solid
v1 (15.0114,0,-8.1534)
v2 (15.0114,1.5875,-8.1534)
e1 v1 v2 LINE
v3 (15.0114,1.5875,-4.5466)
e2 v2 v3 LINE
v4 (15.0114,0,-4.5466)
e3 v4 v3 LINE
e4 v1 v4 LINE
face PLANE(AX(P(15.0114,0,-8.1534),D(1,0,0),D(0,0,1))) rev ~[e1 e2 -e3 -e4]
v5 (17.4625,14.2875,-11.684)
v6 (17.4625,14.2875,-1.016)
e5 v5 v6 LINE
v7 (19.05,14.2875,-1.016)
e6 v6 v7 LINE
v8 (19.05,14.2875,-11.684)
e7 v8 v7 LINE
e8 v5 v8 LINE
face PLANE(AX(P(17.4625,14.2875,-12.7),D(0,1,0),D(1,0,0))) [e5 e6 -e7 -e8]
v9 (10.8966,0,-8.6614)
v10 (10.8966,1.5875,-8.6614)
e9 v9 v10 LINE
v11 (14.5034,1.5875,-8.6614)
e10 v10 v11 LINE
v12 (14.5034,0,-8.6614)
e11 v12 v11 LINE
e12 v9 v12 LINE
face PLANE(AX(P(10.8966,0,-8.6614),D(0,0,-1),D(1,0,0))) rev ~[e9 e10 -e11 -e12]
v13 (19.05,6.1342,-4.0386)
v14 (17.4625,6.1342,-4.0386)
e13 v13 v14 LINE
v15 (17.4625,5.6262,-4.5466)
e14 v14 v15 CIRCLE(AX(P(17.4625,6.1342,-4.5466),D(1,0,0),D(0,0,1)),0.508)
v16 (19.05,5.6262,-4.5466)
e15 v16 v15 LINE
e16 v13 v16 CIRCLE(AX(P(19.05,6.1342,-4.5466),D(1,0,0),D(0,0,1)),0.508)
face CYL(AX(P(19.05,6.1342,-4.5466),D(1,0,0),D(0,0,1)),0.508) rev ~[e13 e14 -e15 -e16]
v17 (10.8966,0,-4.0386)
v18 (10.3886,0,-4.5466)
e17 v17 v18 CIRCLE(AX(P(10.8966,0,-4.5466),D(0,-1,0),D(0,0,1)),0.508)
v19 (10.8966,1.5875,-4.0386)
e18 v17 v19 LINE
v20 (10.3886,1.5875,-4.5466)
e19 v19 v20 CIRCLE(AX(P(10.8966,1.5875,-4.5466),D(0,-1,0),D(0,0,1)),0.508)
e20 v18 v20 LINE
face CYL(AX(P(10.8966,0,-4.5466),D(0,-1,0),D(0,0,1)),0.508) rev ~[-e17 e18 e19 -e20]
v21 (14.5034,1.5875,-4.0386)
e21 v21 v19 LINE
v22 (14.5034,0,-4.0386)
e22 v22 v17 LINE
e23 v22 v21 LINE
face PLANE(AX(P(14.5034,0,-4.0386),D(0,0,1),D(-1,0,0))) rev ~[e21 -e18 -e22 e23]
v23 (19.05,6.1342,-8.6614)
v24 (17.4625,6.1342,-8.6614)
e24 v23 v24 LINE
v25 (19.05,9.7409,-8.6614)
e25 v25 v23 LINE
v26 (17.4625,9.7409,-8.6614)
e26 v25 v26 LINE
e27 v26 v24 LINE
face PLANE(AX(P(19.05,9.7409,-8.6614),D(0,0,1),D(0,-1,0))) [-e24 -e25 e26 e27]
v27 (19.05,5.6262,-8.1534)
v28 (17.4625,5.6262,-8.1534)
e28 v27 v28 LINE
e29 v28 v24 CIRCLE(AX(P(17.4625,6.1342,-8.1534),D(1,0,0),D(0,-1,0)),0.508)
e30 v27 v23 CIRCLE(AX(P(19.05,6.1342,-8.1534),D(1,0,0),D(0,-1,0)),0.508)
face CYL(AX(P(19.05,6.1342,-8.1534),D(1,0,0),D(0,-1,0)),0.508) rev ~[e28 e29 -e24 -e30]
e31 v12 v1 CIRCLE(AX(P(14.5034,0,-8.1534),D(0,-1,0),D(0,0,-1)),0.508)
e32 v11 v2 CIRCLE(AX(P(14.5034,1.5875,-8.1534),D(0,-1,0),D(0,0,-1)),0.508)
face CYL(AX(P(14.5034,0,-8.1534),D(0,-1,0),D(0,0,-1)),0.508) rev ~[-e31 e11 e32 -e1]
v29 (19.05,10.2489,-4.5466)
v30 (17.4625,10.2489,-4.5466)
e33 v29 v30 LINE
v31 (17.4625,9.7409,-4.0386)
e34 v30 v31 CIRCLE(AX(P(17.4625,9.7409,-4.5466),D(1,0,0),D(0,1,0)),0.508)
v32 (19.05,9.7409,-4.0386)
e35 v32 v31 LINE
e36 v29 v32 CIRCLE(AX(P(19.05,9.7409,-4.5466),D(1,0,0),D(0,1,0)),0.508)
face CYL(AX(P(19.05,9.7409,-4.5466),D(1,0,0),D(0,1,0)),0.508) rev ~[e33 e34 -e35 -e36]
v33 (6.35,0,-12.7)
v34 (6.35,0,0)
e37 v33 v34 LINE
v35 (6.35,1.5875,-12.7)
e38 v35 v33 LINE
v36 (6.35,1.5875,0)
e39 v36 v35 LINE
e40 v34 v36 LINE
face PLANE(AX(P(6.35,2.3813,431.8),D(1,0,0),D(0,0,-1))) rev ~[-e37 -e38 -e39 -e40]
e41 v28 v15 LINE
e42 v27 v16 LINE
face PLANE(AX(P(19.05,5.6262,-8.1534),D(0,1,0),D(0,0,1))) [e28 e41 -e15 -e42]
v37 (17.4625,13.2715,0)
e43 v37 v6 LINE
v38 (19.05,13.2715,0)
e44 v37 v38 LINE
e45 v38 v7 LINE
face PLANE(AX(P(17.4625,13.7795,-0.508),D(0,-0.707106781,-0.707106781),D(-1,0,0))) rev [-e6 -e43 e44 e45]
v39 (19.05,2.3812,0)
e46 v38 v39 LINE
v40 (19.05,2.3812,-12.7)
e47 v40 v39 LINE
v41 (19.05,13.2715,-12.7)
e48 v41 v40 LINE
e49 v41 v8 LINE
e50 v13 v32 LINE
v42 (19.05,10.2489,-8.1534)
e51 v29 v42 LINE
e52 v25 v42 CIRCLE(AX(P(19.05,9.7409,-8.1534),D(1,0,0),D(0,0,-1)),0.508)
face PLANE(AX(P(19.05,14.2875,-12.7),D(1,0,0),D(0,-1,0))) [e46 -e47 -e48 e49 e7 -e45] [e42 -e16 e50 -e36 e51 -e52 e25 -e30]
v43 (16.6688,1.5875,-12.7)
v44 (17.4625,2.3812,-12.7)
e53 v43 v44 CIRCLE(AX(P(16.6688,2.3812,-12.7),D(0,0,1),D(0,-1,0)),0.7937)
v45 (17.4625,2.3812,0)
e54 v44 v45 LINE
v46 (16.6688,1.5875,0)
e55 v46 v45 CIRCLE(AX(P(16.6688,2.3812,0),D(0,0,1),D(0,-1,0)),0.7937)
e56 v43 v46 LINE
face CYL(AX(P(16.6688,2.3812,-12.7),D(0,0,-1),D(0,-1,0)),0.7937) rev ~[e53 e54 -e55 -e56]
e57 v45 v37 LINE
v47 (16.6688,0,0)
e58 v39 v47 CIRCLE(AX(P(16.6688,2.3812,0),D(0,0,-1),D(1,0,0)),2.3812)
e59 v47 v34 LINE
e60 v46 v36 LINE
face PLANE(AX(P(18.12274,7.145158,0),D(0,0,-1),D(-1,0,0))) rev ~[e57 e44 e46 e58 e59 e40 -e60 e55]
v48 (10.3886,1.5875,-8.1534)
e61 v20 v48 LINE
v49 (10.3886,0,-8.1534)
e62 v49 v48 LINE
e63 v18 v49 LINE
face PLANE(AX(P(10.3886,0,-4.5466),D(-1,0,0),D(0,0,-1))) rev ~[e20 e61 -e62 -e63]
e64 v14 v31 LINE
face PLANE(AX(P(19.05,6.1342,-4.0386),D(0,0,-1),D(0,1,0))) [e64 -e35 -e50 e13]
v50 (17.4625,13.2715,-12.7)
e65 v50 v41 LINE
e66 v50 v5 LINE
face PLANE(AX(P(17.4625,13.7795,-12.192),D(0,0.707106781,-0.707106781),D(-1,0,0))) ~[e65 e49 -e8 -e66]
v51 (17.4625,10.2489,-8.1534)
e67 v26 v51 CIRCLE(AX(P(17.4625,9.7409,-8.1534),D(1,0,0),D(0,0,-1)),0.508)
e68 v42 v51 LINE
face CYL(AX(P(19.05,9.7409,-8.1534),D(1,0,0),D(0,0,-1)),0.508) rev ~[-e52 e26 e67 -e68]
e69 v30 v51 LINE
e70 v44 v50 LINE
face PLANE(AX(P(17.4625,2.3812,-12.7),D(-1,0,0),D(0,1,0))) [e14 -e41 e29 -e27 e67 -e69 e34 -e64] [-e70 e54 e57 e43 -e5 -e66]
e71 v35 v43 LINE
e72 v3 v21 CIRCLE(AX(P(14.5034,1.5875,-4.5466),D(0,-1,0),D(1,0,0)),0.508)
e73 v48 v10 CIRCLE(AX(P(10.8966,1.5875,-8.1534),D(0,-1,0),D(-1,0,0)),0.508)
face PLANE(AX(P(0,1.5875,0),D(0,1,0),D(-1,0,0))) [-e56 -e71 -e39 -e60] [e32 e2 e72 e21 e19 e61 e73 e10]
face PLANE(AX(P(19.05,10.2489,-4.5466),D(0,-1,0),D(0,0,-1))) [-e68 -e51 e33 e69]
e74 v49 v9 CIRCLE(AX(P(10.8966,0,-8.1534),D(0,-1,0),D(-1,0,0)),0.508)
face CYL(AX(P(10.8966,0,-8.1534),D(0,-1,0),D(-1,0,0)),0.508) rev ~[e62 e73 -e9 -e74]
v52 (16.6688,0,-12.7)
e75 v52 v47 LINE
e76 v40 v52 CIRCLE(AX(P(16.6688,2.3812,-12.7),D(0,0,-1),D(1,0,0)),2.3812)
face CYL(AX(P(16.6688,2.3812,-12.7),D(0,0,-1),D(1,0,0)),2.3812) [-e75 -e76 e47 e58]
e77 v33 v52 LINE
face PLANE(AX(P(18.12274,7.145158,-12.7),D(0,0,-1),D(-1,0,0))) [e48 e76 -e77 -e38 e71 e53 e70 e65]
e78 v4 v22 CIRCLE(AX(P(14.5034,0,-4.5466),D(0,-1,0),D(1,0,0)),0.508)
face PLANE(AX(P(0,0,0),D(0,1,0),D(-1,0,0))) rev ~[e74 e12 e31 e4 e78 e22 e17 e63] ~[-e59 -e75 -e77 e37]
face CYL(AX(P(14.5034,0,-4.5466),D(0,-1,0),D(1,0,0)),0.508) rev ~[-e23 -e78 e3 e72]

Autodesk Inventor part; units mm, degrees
ref_plane "YZ Plane" through (0, 0, 0) normal (1, 0, 0) x (0, 1, 0)
ref_plane "XZ Plane" through (0, 0, 0) normal (0, 1, 0) x (-1, 0, 0)
sketch "Sketch1" plane through (0, 0, 0) normal (0, 1, 0) x (-1, 0, 0)
  line L0 (-19.05, 0) -> (19.05, 0)
  line L1 (19.05, 0) -> (19.05, -12.7)
  line L2 (19.05, -12.7) -> (-19.05, -12.7)
  line L3 (-19.05, -12.7) -> (-19.05, 0)
  line L4 (19.05, 0) -> (-19.05, -12.7) construction
  point P0 (0, 0)
  point P1 (0, 0)
  dimension "d0" = 38.1
  dimension "d1" = 12.7
extrude "Plate1" add sketch "Sketch1" along normal blind 1.5875
sketch "Sketch2" plane through (17.4625, 0, -12.7) normal (1, 0, 0) x (0, 1, 0)
  line L0 (0, 12.7) -> (0, 0)
  line L1 (0, 0) -> (14.2875, 0)
  line L2 (14.2875, 0) -> (14.2875, 12.7)
  line L3 (14.2875, 12.7) -> (0, 12.7)
edge flange "Flanges" height 12.7 angle 90 thickness 1.5875 bend radius 0.7937 thickness toward (1, 0, 0) relief tear relief width 1.5875 relief depth 0.7937 corner gap 1.5875 corner form 0 edges at (19.05, 1.5875, -6.35) (-19.05, 1.5875, -6.35) wall of the first edge with corners at (17.4625, 0, 0) (17.4625, 0, -12.7) (17.4625, 14.2875, -12.7) (17.4625, 14.2875, 0)
bend "Bend1"
corner "Corner1"
sketch "Sketch3" plane through (19.05, 2.3813, -12.7) normal (1, 0, 0) x (0, 0, -1)
  line L0 (-8.1534, 7.8676) -> (-4.5466, 7.8676)
  line L1 (-4.0386, 7.3596) -> (-4.0386, 3.7529)
  line L2 (-4.5466, 3.2449) -> (-8.1534, 3.2449)
  line L3 (-8.6614, 3.7529) -> (-8.6614, 7.3596)
  arc A0 (-8.1534, 7.8676) -> (-8.6614, 7.3596) centre (-8.1534, 7.3596) ccw
  arc A1 (-4.0386, 7.3596) -> (-4.5466, 7.8676) centre (-4.5466, 7.3596) ccw
  arc A2 (-4.5466, 3.2449) -> (-4.0386, 3.7529) centre (-4.5466, 3.7529) ccw
  arc A3 (-8.6614, 3.7529) -> (-8.1534, 3.2449) centre (-8.1534, 3.7529) ccw
  line L4 (-12.7, 0) -> (-12.7, 11.9063) construction
  line L5 (-12.7, 11.9063) -> (0, 11.9063) construction
  line L6 (-8.1534, 7.3596) -> (-4.5466, 3.7529) construction
  point P0 (-12.7, -2.3812)
  point P1 (-4.0386, 3.2449)
  point P2 (-8.6614, 3.2449)
  point P3 (-6.35, 5.5563)
  dimension "d16" = 4.6228
  dimension "d17" = 0.508
  dimension "d20" = 6.35
  dimension "d21" = 6.35
extrude "Flange Stamp" cut sketch "Sketch3" against normal blind 1.5875
sketch "Sketch7" plane through (19.05, 2.3813, 0) normal (1, 0, 0) x (0, 0, -1)
  arc A0 (4.5466, 7.8676) -> (4.0386, 7.3596) centre (4.5466, 7.3596) ccw construction
  arc A1 (8.1534, 3.2449) -> (8.6614, 3.7529) centre (8.1534, 3.7529) ccw construction
  circle A2 centre (6.35, 5.5563) radius 2.1844
  line L0 (4.5466, 7.3596) -> (8.1534, 3.7529) construction
  point P0 (0, -2.3812)
  dimension "d46" = 4.3688
surface extrude "Flange Circle" sketch "Sketch7" against normal up to surface (1.5875 mm away) shown yes curves A2
ref_plane "Flange Pattern Plane" through (19.05, 7.9375, -4.5466) normal (0, 1, 0) x (1, 0, 0)
feature "Flange Pattern" [suppressed]
sketch "Sketch8" plane through (0, 0, 0) normal (0, -1, 0) x (1, 0, 0)
  line L0 (16.6687, 0) -> (-16.6687, 0) construction
  line L1 (14.5034, -4.0386) -> (10.8966, -4.0386)
  line L2 (10.3886, -4.5466) -> (10.3886, -8.1534)
  line L3 (10.8966, -8.6614) -> (14.5034, -8.6614)
  line L4 (15.0114, -8.1534) -> (15.0114, -4.5466)
  arc A0 (15.0114, -4.5466) -> (14.5034, -4.0386) centre (14.5034, -4.5466) ccw
  arc A1 (14.5034, -8.6614) -> (15.0114, -8.1534) centre (14.5034, -8.1534) ccw
  arc A2 (10.3886, -8.1534) -> (10.8966, -8.6614) centre (10.8966, -8.1534) ccw
  arc A3 (10.8966, -4.0386) -> (10.3886, -4.5466) centre (10.8966, -4.5466) ccw
  line L5 (14.5034, -4.5466) -> (10.8966, -8.1534) construction
  line L6 (19.05, 0) -> (19.05, -12.7) construction
  point P0 (0, 0)
  point P1 (10.3886, -8.6614)
  point P2 (15.0114, -8.6614)
  point P3 (12.7, -6.35)
  dimension "d49" = 4.6228
  dimension "d50" = 0.508
  dimension "d51" = 6.35
  dimension "d52" = 6.35
extrude "Body Stamp" cut sketch "Sketch8" against normal blind 1.5875
sketch "Sketch9" plane through (0, 0, 0) normal (0, -1, 0) x (1, 0, 0)
  arc A0 (15.0114, -4.5466) -> (14.5034, -4.0386) centre (14.5034, -4.5466) ccw construction
  arc A1 (10.3886, -8.1534) -> (10.8966, -8.6614) centre (10.8966, -8.1534) ccw construction
  line L0 (14.5034, -4.5466) -> (10.8966, -8.1534) construction
  circle A2 centre (12.7, -6.35) radius 2.1844
  point P0 (0, 0)
  dimension "d55" = 4.3688
surface extrude "Body Circle" sketch "Sketch9" against normal up to surface (1.5875 mm away) shown yes curves A2
feature "Body Pattern" [suppressed]
sketch "Arc Length" plane through (17.4625, 2.3813, 0) normal (0, 0, 1) x (1, 0, 0)
  line L0 (0, 0) -> (1.5875, 0) construction
  arc A0 (-0.7938, -0.7938) -> (0, 0) centre (-0.7937, 0) ccw construction
  line L1 (-0.7938, -2.3813) -> (-0.7938, -0.7938) construction
  arc A1 (-0.7938, -2.3813) -> (1.5875, 0) centre (-0.7937, 0) ccw construction
  point P0 (-17.4625, -2.3812)
  dimension "d85" = 3.7405
  dimension "d92" = 1.2468
feature "Notch" [suppressed]
mirror "Notch Mirror" [suppressed]
pattern_linear "Notch Pattern" [suppressed]
chamfer "End Chamfer" distance 1.016 angle 45 4 edges at (-18.2563, 14.2875, -12.7) (18.2563, 14.2875, -12.7) (-18.2562, 14.2875, 0) (18.2562, 14.2875, 0)
sketch "Sketch14" plane through (-19.05, 2.3813, 431.8) normal (1, 0, 0) x (0, 0, -1)
  line L0 (431.8, 11.9063) -> (444.5, 11.9063) construction
  line L1 (431.8, 0) -> (431.8, 11.9063) construction
  line L2 (431.8, -2.3813) -> (444.5, -2.3813) construction
  line L3 (431.8, 11.9063) -> (444.5, 11.9063)
  line L4 (444.5, 11.9063) -> (444.5, -2.3813)
  line L5 (444.5, -2.3813) -> (431.8, -2.3813)
  line L6 (431.8, -2.3813) -> (431.8, 11.9063)
  point P0 (431.8, -2.3812)
  point P1 (382.0521, -1.9844)
extrude "Half Cut" cut sketch "Sketch14" along normal blind 25.4
sketch "Flange Pattern Sketch" plane through (19.05, 7.9375, -4.5466) normal (0, 1, 0) x (1, 0, 0)
  line L0 (0, 3.6068) -> (0, 0) construction
  line L1 (-45.8186, -4.5466) -> (8.2118, -4.5466) construction
  line L2 (0, 0) -> (-1.5875, 0) construction
  point P0 (-19.05, -4.5466)
  point P1 (0, 1.8034)
  point P2 (0, 14.5034)
  point P3 (0, 27.2034)
  point P4 (0, 39.9034)
  point P5 (0, 52.6034)
  point P6 (0, 65.3034)
  point P7 (0, 78.0034)
  point P8 (0, 90.7034)
  point P9 (0, 103.4034)
  point P10 (0, 116.1034)
  point P11 (0, 128.8034)
  point P12 (0, 141.5034)
  point P13 (0, 154.2034)
  point P14 (0, 166.9034)
  point P15 (0, 179.6034)
  point P16 (0, 192.3034)
  point P17 (0, 205.0034)
  point P18 (0, 217.7034)
  point P19 (0, 230.4034)
  point P20 (0, 243.1034)
  point P21 (0, 255.8034)
  point P22 (0, 268.5034)
  point P23 (0, 281.2034)
  point P24 (0, 293.9034)
  point P25 (0, 306.6034)
  point P26 (0, 319.3034)
  point P27 (0, 332.0034)
  point P28 (0, 344.7034)
  point P29 (0, 357.4034)
  point P30 (0, 370.1034)
  point P31 (0, 382.8034)
  point P32 (0, 395.5034)
  point P33 (0, 408.2034)
  point P34 (0, 420.9034)
  point P35 (0, 433.6034)
  dimension "d134" = 12.7
sketch "Body Pattern Sketch" plane through (0, 0, 0) normal (0, -1, 0) x (1, 0, 0)
  line L0 (16.6687, 0) -> (-16.6687, 0) construction
  line L1 (19.05, 0) -> (19.05, -12.7) construction
  circle A0 centre (12.7, -6.35) radius 2.1844 construction
  point P0 (0, 0)
  point P1 (12.7, -19.05)
  point P2 (12.7, -31.75)
  point P3 (12.7, -44.45)
  point P4 (12.7, -57.15)
  point P5 (12.7, -69.85)
  point P6 (12.7, -82.55)
  point P7 (12.7, -95.25)
  point P8 (12.7, -107.95)
  point P9 (12.7, -120.65)
  point P10 (12.7, -133.35)
  point P11 (12.7, -146.05)
  point P12 (12.7, -158.75)
  point P13 (12.7, -171.45)
  point P14 (12.7, -184.15)
  point P15 (12.7, -196.85)
  point P16 (12.7, -209.55)
  point P17 (12.7, -222.25)
  point P18 (12.7, -234.95)
  point P19 (12.7, -247.65)
  point P20 (12.7, -260.35)
  point P21 (12.7, -273.05)
  point P22 (12.7, -285.75)
  point P23 (12.7, -298.45)
  point P24 (12.7, -311.15)
  point P25 (12.7, -323.85)
  point P26 (12.7, -336.55)
  point P27 (12.7, -349.25)
  point P28 (12.7, -361.95)
  point P29 (12.7, -374.65)
  point P30 (12.7, -387.35)
  point P31 (12.7, -400.05)
  point P32 (12.7, -412.75)
  point P33 (12.7, -425.45)
  point P34 (12.7, -438.15)
  dimension "d139" = 12.7
sketch "Sketch13" plane through (19.05, 14.2875, 0) normal (1, 0, 0) x (0, 0, -1)
  line L0 (0, 0) -> (12.7, 0) construction
  line L1 (62.4078, 0) -> (63.4238, -1.016)
  line L2 (63.4238, -1.016) -> (64.4398, 0)
  line L3 (62.4078, 0) -> (64.4398, 0)
  line L4 (12.7, -11.9063) -> (0, -11.9062) construction
  line L5 (63.4238, -10.8903) -> (61.161, -13.1531)
  line L6 (61.161, -13.1531) -> (63.4238, -15.4159)
  line L7 (63.4238, -15.4159) -> (65.6866, -13.1531)
  line L8 (65.6866, -13.1531) -> (63.4238, -10.8903)
  line L9 (63.4238, -10.8903) -> (63.4238, -15.4159) construction
  line L10 (63.4238, -1.016) -> (63.4238, -10.8903) construction
  line L11 (0, -11.9062) -> (12.7, -11.9063) construction
  point P0 (0, -14.2875)
  dimension "d86" = 4.5256
  dimension "d88" = 1.016
  dimension "d91" = 1.016
  dimension "d102" = 63.4238
equation "\"d18\" = Thickness"
equation "\"d53\" = Thickness"
equation "\"d89\" = Thickness"
equation "\"d1\" = 12.7 * Length"
equation "\"d2\" = Thickness"
equation "\"d3\" = BendReliefWidth"
equation "\"d4\" = BendReliefDepth"
equation "\"d5\" = MinimumRemnant"
equation "\"d6\" = TransitionRadius"
equation "\"d10\" = CornerReliefSize"
equation "\"d11\" = GapSize"
equation "\"d12\" = JacobiRadiusSize"
equation "\"BendRadius\" = Thickness"
equation "\"BendReliefWidth\" = Thickness"
equation "\"BendReliefDepth\" = 0.5 * Thickness"
equation "\"CornerReliefSize\" = 4 * Thickness"
equation "\"MinimumRemnant\" = 2 * Thickness"
equation "\"TransitionRadius\" = BendRadius"
equation "\"JacobiRadiusSize\" = BendRadius"
equation "\"GapSize\" = Thickness"
equation "\"Thickness\" = 1.5875"
equation "\"Length\" = 1"
properties part number "Alu C 1x3x1x35"
